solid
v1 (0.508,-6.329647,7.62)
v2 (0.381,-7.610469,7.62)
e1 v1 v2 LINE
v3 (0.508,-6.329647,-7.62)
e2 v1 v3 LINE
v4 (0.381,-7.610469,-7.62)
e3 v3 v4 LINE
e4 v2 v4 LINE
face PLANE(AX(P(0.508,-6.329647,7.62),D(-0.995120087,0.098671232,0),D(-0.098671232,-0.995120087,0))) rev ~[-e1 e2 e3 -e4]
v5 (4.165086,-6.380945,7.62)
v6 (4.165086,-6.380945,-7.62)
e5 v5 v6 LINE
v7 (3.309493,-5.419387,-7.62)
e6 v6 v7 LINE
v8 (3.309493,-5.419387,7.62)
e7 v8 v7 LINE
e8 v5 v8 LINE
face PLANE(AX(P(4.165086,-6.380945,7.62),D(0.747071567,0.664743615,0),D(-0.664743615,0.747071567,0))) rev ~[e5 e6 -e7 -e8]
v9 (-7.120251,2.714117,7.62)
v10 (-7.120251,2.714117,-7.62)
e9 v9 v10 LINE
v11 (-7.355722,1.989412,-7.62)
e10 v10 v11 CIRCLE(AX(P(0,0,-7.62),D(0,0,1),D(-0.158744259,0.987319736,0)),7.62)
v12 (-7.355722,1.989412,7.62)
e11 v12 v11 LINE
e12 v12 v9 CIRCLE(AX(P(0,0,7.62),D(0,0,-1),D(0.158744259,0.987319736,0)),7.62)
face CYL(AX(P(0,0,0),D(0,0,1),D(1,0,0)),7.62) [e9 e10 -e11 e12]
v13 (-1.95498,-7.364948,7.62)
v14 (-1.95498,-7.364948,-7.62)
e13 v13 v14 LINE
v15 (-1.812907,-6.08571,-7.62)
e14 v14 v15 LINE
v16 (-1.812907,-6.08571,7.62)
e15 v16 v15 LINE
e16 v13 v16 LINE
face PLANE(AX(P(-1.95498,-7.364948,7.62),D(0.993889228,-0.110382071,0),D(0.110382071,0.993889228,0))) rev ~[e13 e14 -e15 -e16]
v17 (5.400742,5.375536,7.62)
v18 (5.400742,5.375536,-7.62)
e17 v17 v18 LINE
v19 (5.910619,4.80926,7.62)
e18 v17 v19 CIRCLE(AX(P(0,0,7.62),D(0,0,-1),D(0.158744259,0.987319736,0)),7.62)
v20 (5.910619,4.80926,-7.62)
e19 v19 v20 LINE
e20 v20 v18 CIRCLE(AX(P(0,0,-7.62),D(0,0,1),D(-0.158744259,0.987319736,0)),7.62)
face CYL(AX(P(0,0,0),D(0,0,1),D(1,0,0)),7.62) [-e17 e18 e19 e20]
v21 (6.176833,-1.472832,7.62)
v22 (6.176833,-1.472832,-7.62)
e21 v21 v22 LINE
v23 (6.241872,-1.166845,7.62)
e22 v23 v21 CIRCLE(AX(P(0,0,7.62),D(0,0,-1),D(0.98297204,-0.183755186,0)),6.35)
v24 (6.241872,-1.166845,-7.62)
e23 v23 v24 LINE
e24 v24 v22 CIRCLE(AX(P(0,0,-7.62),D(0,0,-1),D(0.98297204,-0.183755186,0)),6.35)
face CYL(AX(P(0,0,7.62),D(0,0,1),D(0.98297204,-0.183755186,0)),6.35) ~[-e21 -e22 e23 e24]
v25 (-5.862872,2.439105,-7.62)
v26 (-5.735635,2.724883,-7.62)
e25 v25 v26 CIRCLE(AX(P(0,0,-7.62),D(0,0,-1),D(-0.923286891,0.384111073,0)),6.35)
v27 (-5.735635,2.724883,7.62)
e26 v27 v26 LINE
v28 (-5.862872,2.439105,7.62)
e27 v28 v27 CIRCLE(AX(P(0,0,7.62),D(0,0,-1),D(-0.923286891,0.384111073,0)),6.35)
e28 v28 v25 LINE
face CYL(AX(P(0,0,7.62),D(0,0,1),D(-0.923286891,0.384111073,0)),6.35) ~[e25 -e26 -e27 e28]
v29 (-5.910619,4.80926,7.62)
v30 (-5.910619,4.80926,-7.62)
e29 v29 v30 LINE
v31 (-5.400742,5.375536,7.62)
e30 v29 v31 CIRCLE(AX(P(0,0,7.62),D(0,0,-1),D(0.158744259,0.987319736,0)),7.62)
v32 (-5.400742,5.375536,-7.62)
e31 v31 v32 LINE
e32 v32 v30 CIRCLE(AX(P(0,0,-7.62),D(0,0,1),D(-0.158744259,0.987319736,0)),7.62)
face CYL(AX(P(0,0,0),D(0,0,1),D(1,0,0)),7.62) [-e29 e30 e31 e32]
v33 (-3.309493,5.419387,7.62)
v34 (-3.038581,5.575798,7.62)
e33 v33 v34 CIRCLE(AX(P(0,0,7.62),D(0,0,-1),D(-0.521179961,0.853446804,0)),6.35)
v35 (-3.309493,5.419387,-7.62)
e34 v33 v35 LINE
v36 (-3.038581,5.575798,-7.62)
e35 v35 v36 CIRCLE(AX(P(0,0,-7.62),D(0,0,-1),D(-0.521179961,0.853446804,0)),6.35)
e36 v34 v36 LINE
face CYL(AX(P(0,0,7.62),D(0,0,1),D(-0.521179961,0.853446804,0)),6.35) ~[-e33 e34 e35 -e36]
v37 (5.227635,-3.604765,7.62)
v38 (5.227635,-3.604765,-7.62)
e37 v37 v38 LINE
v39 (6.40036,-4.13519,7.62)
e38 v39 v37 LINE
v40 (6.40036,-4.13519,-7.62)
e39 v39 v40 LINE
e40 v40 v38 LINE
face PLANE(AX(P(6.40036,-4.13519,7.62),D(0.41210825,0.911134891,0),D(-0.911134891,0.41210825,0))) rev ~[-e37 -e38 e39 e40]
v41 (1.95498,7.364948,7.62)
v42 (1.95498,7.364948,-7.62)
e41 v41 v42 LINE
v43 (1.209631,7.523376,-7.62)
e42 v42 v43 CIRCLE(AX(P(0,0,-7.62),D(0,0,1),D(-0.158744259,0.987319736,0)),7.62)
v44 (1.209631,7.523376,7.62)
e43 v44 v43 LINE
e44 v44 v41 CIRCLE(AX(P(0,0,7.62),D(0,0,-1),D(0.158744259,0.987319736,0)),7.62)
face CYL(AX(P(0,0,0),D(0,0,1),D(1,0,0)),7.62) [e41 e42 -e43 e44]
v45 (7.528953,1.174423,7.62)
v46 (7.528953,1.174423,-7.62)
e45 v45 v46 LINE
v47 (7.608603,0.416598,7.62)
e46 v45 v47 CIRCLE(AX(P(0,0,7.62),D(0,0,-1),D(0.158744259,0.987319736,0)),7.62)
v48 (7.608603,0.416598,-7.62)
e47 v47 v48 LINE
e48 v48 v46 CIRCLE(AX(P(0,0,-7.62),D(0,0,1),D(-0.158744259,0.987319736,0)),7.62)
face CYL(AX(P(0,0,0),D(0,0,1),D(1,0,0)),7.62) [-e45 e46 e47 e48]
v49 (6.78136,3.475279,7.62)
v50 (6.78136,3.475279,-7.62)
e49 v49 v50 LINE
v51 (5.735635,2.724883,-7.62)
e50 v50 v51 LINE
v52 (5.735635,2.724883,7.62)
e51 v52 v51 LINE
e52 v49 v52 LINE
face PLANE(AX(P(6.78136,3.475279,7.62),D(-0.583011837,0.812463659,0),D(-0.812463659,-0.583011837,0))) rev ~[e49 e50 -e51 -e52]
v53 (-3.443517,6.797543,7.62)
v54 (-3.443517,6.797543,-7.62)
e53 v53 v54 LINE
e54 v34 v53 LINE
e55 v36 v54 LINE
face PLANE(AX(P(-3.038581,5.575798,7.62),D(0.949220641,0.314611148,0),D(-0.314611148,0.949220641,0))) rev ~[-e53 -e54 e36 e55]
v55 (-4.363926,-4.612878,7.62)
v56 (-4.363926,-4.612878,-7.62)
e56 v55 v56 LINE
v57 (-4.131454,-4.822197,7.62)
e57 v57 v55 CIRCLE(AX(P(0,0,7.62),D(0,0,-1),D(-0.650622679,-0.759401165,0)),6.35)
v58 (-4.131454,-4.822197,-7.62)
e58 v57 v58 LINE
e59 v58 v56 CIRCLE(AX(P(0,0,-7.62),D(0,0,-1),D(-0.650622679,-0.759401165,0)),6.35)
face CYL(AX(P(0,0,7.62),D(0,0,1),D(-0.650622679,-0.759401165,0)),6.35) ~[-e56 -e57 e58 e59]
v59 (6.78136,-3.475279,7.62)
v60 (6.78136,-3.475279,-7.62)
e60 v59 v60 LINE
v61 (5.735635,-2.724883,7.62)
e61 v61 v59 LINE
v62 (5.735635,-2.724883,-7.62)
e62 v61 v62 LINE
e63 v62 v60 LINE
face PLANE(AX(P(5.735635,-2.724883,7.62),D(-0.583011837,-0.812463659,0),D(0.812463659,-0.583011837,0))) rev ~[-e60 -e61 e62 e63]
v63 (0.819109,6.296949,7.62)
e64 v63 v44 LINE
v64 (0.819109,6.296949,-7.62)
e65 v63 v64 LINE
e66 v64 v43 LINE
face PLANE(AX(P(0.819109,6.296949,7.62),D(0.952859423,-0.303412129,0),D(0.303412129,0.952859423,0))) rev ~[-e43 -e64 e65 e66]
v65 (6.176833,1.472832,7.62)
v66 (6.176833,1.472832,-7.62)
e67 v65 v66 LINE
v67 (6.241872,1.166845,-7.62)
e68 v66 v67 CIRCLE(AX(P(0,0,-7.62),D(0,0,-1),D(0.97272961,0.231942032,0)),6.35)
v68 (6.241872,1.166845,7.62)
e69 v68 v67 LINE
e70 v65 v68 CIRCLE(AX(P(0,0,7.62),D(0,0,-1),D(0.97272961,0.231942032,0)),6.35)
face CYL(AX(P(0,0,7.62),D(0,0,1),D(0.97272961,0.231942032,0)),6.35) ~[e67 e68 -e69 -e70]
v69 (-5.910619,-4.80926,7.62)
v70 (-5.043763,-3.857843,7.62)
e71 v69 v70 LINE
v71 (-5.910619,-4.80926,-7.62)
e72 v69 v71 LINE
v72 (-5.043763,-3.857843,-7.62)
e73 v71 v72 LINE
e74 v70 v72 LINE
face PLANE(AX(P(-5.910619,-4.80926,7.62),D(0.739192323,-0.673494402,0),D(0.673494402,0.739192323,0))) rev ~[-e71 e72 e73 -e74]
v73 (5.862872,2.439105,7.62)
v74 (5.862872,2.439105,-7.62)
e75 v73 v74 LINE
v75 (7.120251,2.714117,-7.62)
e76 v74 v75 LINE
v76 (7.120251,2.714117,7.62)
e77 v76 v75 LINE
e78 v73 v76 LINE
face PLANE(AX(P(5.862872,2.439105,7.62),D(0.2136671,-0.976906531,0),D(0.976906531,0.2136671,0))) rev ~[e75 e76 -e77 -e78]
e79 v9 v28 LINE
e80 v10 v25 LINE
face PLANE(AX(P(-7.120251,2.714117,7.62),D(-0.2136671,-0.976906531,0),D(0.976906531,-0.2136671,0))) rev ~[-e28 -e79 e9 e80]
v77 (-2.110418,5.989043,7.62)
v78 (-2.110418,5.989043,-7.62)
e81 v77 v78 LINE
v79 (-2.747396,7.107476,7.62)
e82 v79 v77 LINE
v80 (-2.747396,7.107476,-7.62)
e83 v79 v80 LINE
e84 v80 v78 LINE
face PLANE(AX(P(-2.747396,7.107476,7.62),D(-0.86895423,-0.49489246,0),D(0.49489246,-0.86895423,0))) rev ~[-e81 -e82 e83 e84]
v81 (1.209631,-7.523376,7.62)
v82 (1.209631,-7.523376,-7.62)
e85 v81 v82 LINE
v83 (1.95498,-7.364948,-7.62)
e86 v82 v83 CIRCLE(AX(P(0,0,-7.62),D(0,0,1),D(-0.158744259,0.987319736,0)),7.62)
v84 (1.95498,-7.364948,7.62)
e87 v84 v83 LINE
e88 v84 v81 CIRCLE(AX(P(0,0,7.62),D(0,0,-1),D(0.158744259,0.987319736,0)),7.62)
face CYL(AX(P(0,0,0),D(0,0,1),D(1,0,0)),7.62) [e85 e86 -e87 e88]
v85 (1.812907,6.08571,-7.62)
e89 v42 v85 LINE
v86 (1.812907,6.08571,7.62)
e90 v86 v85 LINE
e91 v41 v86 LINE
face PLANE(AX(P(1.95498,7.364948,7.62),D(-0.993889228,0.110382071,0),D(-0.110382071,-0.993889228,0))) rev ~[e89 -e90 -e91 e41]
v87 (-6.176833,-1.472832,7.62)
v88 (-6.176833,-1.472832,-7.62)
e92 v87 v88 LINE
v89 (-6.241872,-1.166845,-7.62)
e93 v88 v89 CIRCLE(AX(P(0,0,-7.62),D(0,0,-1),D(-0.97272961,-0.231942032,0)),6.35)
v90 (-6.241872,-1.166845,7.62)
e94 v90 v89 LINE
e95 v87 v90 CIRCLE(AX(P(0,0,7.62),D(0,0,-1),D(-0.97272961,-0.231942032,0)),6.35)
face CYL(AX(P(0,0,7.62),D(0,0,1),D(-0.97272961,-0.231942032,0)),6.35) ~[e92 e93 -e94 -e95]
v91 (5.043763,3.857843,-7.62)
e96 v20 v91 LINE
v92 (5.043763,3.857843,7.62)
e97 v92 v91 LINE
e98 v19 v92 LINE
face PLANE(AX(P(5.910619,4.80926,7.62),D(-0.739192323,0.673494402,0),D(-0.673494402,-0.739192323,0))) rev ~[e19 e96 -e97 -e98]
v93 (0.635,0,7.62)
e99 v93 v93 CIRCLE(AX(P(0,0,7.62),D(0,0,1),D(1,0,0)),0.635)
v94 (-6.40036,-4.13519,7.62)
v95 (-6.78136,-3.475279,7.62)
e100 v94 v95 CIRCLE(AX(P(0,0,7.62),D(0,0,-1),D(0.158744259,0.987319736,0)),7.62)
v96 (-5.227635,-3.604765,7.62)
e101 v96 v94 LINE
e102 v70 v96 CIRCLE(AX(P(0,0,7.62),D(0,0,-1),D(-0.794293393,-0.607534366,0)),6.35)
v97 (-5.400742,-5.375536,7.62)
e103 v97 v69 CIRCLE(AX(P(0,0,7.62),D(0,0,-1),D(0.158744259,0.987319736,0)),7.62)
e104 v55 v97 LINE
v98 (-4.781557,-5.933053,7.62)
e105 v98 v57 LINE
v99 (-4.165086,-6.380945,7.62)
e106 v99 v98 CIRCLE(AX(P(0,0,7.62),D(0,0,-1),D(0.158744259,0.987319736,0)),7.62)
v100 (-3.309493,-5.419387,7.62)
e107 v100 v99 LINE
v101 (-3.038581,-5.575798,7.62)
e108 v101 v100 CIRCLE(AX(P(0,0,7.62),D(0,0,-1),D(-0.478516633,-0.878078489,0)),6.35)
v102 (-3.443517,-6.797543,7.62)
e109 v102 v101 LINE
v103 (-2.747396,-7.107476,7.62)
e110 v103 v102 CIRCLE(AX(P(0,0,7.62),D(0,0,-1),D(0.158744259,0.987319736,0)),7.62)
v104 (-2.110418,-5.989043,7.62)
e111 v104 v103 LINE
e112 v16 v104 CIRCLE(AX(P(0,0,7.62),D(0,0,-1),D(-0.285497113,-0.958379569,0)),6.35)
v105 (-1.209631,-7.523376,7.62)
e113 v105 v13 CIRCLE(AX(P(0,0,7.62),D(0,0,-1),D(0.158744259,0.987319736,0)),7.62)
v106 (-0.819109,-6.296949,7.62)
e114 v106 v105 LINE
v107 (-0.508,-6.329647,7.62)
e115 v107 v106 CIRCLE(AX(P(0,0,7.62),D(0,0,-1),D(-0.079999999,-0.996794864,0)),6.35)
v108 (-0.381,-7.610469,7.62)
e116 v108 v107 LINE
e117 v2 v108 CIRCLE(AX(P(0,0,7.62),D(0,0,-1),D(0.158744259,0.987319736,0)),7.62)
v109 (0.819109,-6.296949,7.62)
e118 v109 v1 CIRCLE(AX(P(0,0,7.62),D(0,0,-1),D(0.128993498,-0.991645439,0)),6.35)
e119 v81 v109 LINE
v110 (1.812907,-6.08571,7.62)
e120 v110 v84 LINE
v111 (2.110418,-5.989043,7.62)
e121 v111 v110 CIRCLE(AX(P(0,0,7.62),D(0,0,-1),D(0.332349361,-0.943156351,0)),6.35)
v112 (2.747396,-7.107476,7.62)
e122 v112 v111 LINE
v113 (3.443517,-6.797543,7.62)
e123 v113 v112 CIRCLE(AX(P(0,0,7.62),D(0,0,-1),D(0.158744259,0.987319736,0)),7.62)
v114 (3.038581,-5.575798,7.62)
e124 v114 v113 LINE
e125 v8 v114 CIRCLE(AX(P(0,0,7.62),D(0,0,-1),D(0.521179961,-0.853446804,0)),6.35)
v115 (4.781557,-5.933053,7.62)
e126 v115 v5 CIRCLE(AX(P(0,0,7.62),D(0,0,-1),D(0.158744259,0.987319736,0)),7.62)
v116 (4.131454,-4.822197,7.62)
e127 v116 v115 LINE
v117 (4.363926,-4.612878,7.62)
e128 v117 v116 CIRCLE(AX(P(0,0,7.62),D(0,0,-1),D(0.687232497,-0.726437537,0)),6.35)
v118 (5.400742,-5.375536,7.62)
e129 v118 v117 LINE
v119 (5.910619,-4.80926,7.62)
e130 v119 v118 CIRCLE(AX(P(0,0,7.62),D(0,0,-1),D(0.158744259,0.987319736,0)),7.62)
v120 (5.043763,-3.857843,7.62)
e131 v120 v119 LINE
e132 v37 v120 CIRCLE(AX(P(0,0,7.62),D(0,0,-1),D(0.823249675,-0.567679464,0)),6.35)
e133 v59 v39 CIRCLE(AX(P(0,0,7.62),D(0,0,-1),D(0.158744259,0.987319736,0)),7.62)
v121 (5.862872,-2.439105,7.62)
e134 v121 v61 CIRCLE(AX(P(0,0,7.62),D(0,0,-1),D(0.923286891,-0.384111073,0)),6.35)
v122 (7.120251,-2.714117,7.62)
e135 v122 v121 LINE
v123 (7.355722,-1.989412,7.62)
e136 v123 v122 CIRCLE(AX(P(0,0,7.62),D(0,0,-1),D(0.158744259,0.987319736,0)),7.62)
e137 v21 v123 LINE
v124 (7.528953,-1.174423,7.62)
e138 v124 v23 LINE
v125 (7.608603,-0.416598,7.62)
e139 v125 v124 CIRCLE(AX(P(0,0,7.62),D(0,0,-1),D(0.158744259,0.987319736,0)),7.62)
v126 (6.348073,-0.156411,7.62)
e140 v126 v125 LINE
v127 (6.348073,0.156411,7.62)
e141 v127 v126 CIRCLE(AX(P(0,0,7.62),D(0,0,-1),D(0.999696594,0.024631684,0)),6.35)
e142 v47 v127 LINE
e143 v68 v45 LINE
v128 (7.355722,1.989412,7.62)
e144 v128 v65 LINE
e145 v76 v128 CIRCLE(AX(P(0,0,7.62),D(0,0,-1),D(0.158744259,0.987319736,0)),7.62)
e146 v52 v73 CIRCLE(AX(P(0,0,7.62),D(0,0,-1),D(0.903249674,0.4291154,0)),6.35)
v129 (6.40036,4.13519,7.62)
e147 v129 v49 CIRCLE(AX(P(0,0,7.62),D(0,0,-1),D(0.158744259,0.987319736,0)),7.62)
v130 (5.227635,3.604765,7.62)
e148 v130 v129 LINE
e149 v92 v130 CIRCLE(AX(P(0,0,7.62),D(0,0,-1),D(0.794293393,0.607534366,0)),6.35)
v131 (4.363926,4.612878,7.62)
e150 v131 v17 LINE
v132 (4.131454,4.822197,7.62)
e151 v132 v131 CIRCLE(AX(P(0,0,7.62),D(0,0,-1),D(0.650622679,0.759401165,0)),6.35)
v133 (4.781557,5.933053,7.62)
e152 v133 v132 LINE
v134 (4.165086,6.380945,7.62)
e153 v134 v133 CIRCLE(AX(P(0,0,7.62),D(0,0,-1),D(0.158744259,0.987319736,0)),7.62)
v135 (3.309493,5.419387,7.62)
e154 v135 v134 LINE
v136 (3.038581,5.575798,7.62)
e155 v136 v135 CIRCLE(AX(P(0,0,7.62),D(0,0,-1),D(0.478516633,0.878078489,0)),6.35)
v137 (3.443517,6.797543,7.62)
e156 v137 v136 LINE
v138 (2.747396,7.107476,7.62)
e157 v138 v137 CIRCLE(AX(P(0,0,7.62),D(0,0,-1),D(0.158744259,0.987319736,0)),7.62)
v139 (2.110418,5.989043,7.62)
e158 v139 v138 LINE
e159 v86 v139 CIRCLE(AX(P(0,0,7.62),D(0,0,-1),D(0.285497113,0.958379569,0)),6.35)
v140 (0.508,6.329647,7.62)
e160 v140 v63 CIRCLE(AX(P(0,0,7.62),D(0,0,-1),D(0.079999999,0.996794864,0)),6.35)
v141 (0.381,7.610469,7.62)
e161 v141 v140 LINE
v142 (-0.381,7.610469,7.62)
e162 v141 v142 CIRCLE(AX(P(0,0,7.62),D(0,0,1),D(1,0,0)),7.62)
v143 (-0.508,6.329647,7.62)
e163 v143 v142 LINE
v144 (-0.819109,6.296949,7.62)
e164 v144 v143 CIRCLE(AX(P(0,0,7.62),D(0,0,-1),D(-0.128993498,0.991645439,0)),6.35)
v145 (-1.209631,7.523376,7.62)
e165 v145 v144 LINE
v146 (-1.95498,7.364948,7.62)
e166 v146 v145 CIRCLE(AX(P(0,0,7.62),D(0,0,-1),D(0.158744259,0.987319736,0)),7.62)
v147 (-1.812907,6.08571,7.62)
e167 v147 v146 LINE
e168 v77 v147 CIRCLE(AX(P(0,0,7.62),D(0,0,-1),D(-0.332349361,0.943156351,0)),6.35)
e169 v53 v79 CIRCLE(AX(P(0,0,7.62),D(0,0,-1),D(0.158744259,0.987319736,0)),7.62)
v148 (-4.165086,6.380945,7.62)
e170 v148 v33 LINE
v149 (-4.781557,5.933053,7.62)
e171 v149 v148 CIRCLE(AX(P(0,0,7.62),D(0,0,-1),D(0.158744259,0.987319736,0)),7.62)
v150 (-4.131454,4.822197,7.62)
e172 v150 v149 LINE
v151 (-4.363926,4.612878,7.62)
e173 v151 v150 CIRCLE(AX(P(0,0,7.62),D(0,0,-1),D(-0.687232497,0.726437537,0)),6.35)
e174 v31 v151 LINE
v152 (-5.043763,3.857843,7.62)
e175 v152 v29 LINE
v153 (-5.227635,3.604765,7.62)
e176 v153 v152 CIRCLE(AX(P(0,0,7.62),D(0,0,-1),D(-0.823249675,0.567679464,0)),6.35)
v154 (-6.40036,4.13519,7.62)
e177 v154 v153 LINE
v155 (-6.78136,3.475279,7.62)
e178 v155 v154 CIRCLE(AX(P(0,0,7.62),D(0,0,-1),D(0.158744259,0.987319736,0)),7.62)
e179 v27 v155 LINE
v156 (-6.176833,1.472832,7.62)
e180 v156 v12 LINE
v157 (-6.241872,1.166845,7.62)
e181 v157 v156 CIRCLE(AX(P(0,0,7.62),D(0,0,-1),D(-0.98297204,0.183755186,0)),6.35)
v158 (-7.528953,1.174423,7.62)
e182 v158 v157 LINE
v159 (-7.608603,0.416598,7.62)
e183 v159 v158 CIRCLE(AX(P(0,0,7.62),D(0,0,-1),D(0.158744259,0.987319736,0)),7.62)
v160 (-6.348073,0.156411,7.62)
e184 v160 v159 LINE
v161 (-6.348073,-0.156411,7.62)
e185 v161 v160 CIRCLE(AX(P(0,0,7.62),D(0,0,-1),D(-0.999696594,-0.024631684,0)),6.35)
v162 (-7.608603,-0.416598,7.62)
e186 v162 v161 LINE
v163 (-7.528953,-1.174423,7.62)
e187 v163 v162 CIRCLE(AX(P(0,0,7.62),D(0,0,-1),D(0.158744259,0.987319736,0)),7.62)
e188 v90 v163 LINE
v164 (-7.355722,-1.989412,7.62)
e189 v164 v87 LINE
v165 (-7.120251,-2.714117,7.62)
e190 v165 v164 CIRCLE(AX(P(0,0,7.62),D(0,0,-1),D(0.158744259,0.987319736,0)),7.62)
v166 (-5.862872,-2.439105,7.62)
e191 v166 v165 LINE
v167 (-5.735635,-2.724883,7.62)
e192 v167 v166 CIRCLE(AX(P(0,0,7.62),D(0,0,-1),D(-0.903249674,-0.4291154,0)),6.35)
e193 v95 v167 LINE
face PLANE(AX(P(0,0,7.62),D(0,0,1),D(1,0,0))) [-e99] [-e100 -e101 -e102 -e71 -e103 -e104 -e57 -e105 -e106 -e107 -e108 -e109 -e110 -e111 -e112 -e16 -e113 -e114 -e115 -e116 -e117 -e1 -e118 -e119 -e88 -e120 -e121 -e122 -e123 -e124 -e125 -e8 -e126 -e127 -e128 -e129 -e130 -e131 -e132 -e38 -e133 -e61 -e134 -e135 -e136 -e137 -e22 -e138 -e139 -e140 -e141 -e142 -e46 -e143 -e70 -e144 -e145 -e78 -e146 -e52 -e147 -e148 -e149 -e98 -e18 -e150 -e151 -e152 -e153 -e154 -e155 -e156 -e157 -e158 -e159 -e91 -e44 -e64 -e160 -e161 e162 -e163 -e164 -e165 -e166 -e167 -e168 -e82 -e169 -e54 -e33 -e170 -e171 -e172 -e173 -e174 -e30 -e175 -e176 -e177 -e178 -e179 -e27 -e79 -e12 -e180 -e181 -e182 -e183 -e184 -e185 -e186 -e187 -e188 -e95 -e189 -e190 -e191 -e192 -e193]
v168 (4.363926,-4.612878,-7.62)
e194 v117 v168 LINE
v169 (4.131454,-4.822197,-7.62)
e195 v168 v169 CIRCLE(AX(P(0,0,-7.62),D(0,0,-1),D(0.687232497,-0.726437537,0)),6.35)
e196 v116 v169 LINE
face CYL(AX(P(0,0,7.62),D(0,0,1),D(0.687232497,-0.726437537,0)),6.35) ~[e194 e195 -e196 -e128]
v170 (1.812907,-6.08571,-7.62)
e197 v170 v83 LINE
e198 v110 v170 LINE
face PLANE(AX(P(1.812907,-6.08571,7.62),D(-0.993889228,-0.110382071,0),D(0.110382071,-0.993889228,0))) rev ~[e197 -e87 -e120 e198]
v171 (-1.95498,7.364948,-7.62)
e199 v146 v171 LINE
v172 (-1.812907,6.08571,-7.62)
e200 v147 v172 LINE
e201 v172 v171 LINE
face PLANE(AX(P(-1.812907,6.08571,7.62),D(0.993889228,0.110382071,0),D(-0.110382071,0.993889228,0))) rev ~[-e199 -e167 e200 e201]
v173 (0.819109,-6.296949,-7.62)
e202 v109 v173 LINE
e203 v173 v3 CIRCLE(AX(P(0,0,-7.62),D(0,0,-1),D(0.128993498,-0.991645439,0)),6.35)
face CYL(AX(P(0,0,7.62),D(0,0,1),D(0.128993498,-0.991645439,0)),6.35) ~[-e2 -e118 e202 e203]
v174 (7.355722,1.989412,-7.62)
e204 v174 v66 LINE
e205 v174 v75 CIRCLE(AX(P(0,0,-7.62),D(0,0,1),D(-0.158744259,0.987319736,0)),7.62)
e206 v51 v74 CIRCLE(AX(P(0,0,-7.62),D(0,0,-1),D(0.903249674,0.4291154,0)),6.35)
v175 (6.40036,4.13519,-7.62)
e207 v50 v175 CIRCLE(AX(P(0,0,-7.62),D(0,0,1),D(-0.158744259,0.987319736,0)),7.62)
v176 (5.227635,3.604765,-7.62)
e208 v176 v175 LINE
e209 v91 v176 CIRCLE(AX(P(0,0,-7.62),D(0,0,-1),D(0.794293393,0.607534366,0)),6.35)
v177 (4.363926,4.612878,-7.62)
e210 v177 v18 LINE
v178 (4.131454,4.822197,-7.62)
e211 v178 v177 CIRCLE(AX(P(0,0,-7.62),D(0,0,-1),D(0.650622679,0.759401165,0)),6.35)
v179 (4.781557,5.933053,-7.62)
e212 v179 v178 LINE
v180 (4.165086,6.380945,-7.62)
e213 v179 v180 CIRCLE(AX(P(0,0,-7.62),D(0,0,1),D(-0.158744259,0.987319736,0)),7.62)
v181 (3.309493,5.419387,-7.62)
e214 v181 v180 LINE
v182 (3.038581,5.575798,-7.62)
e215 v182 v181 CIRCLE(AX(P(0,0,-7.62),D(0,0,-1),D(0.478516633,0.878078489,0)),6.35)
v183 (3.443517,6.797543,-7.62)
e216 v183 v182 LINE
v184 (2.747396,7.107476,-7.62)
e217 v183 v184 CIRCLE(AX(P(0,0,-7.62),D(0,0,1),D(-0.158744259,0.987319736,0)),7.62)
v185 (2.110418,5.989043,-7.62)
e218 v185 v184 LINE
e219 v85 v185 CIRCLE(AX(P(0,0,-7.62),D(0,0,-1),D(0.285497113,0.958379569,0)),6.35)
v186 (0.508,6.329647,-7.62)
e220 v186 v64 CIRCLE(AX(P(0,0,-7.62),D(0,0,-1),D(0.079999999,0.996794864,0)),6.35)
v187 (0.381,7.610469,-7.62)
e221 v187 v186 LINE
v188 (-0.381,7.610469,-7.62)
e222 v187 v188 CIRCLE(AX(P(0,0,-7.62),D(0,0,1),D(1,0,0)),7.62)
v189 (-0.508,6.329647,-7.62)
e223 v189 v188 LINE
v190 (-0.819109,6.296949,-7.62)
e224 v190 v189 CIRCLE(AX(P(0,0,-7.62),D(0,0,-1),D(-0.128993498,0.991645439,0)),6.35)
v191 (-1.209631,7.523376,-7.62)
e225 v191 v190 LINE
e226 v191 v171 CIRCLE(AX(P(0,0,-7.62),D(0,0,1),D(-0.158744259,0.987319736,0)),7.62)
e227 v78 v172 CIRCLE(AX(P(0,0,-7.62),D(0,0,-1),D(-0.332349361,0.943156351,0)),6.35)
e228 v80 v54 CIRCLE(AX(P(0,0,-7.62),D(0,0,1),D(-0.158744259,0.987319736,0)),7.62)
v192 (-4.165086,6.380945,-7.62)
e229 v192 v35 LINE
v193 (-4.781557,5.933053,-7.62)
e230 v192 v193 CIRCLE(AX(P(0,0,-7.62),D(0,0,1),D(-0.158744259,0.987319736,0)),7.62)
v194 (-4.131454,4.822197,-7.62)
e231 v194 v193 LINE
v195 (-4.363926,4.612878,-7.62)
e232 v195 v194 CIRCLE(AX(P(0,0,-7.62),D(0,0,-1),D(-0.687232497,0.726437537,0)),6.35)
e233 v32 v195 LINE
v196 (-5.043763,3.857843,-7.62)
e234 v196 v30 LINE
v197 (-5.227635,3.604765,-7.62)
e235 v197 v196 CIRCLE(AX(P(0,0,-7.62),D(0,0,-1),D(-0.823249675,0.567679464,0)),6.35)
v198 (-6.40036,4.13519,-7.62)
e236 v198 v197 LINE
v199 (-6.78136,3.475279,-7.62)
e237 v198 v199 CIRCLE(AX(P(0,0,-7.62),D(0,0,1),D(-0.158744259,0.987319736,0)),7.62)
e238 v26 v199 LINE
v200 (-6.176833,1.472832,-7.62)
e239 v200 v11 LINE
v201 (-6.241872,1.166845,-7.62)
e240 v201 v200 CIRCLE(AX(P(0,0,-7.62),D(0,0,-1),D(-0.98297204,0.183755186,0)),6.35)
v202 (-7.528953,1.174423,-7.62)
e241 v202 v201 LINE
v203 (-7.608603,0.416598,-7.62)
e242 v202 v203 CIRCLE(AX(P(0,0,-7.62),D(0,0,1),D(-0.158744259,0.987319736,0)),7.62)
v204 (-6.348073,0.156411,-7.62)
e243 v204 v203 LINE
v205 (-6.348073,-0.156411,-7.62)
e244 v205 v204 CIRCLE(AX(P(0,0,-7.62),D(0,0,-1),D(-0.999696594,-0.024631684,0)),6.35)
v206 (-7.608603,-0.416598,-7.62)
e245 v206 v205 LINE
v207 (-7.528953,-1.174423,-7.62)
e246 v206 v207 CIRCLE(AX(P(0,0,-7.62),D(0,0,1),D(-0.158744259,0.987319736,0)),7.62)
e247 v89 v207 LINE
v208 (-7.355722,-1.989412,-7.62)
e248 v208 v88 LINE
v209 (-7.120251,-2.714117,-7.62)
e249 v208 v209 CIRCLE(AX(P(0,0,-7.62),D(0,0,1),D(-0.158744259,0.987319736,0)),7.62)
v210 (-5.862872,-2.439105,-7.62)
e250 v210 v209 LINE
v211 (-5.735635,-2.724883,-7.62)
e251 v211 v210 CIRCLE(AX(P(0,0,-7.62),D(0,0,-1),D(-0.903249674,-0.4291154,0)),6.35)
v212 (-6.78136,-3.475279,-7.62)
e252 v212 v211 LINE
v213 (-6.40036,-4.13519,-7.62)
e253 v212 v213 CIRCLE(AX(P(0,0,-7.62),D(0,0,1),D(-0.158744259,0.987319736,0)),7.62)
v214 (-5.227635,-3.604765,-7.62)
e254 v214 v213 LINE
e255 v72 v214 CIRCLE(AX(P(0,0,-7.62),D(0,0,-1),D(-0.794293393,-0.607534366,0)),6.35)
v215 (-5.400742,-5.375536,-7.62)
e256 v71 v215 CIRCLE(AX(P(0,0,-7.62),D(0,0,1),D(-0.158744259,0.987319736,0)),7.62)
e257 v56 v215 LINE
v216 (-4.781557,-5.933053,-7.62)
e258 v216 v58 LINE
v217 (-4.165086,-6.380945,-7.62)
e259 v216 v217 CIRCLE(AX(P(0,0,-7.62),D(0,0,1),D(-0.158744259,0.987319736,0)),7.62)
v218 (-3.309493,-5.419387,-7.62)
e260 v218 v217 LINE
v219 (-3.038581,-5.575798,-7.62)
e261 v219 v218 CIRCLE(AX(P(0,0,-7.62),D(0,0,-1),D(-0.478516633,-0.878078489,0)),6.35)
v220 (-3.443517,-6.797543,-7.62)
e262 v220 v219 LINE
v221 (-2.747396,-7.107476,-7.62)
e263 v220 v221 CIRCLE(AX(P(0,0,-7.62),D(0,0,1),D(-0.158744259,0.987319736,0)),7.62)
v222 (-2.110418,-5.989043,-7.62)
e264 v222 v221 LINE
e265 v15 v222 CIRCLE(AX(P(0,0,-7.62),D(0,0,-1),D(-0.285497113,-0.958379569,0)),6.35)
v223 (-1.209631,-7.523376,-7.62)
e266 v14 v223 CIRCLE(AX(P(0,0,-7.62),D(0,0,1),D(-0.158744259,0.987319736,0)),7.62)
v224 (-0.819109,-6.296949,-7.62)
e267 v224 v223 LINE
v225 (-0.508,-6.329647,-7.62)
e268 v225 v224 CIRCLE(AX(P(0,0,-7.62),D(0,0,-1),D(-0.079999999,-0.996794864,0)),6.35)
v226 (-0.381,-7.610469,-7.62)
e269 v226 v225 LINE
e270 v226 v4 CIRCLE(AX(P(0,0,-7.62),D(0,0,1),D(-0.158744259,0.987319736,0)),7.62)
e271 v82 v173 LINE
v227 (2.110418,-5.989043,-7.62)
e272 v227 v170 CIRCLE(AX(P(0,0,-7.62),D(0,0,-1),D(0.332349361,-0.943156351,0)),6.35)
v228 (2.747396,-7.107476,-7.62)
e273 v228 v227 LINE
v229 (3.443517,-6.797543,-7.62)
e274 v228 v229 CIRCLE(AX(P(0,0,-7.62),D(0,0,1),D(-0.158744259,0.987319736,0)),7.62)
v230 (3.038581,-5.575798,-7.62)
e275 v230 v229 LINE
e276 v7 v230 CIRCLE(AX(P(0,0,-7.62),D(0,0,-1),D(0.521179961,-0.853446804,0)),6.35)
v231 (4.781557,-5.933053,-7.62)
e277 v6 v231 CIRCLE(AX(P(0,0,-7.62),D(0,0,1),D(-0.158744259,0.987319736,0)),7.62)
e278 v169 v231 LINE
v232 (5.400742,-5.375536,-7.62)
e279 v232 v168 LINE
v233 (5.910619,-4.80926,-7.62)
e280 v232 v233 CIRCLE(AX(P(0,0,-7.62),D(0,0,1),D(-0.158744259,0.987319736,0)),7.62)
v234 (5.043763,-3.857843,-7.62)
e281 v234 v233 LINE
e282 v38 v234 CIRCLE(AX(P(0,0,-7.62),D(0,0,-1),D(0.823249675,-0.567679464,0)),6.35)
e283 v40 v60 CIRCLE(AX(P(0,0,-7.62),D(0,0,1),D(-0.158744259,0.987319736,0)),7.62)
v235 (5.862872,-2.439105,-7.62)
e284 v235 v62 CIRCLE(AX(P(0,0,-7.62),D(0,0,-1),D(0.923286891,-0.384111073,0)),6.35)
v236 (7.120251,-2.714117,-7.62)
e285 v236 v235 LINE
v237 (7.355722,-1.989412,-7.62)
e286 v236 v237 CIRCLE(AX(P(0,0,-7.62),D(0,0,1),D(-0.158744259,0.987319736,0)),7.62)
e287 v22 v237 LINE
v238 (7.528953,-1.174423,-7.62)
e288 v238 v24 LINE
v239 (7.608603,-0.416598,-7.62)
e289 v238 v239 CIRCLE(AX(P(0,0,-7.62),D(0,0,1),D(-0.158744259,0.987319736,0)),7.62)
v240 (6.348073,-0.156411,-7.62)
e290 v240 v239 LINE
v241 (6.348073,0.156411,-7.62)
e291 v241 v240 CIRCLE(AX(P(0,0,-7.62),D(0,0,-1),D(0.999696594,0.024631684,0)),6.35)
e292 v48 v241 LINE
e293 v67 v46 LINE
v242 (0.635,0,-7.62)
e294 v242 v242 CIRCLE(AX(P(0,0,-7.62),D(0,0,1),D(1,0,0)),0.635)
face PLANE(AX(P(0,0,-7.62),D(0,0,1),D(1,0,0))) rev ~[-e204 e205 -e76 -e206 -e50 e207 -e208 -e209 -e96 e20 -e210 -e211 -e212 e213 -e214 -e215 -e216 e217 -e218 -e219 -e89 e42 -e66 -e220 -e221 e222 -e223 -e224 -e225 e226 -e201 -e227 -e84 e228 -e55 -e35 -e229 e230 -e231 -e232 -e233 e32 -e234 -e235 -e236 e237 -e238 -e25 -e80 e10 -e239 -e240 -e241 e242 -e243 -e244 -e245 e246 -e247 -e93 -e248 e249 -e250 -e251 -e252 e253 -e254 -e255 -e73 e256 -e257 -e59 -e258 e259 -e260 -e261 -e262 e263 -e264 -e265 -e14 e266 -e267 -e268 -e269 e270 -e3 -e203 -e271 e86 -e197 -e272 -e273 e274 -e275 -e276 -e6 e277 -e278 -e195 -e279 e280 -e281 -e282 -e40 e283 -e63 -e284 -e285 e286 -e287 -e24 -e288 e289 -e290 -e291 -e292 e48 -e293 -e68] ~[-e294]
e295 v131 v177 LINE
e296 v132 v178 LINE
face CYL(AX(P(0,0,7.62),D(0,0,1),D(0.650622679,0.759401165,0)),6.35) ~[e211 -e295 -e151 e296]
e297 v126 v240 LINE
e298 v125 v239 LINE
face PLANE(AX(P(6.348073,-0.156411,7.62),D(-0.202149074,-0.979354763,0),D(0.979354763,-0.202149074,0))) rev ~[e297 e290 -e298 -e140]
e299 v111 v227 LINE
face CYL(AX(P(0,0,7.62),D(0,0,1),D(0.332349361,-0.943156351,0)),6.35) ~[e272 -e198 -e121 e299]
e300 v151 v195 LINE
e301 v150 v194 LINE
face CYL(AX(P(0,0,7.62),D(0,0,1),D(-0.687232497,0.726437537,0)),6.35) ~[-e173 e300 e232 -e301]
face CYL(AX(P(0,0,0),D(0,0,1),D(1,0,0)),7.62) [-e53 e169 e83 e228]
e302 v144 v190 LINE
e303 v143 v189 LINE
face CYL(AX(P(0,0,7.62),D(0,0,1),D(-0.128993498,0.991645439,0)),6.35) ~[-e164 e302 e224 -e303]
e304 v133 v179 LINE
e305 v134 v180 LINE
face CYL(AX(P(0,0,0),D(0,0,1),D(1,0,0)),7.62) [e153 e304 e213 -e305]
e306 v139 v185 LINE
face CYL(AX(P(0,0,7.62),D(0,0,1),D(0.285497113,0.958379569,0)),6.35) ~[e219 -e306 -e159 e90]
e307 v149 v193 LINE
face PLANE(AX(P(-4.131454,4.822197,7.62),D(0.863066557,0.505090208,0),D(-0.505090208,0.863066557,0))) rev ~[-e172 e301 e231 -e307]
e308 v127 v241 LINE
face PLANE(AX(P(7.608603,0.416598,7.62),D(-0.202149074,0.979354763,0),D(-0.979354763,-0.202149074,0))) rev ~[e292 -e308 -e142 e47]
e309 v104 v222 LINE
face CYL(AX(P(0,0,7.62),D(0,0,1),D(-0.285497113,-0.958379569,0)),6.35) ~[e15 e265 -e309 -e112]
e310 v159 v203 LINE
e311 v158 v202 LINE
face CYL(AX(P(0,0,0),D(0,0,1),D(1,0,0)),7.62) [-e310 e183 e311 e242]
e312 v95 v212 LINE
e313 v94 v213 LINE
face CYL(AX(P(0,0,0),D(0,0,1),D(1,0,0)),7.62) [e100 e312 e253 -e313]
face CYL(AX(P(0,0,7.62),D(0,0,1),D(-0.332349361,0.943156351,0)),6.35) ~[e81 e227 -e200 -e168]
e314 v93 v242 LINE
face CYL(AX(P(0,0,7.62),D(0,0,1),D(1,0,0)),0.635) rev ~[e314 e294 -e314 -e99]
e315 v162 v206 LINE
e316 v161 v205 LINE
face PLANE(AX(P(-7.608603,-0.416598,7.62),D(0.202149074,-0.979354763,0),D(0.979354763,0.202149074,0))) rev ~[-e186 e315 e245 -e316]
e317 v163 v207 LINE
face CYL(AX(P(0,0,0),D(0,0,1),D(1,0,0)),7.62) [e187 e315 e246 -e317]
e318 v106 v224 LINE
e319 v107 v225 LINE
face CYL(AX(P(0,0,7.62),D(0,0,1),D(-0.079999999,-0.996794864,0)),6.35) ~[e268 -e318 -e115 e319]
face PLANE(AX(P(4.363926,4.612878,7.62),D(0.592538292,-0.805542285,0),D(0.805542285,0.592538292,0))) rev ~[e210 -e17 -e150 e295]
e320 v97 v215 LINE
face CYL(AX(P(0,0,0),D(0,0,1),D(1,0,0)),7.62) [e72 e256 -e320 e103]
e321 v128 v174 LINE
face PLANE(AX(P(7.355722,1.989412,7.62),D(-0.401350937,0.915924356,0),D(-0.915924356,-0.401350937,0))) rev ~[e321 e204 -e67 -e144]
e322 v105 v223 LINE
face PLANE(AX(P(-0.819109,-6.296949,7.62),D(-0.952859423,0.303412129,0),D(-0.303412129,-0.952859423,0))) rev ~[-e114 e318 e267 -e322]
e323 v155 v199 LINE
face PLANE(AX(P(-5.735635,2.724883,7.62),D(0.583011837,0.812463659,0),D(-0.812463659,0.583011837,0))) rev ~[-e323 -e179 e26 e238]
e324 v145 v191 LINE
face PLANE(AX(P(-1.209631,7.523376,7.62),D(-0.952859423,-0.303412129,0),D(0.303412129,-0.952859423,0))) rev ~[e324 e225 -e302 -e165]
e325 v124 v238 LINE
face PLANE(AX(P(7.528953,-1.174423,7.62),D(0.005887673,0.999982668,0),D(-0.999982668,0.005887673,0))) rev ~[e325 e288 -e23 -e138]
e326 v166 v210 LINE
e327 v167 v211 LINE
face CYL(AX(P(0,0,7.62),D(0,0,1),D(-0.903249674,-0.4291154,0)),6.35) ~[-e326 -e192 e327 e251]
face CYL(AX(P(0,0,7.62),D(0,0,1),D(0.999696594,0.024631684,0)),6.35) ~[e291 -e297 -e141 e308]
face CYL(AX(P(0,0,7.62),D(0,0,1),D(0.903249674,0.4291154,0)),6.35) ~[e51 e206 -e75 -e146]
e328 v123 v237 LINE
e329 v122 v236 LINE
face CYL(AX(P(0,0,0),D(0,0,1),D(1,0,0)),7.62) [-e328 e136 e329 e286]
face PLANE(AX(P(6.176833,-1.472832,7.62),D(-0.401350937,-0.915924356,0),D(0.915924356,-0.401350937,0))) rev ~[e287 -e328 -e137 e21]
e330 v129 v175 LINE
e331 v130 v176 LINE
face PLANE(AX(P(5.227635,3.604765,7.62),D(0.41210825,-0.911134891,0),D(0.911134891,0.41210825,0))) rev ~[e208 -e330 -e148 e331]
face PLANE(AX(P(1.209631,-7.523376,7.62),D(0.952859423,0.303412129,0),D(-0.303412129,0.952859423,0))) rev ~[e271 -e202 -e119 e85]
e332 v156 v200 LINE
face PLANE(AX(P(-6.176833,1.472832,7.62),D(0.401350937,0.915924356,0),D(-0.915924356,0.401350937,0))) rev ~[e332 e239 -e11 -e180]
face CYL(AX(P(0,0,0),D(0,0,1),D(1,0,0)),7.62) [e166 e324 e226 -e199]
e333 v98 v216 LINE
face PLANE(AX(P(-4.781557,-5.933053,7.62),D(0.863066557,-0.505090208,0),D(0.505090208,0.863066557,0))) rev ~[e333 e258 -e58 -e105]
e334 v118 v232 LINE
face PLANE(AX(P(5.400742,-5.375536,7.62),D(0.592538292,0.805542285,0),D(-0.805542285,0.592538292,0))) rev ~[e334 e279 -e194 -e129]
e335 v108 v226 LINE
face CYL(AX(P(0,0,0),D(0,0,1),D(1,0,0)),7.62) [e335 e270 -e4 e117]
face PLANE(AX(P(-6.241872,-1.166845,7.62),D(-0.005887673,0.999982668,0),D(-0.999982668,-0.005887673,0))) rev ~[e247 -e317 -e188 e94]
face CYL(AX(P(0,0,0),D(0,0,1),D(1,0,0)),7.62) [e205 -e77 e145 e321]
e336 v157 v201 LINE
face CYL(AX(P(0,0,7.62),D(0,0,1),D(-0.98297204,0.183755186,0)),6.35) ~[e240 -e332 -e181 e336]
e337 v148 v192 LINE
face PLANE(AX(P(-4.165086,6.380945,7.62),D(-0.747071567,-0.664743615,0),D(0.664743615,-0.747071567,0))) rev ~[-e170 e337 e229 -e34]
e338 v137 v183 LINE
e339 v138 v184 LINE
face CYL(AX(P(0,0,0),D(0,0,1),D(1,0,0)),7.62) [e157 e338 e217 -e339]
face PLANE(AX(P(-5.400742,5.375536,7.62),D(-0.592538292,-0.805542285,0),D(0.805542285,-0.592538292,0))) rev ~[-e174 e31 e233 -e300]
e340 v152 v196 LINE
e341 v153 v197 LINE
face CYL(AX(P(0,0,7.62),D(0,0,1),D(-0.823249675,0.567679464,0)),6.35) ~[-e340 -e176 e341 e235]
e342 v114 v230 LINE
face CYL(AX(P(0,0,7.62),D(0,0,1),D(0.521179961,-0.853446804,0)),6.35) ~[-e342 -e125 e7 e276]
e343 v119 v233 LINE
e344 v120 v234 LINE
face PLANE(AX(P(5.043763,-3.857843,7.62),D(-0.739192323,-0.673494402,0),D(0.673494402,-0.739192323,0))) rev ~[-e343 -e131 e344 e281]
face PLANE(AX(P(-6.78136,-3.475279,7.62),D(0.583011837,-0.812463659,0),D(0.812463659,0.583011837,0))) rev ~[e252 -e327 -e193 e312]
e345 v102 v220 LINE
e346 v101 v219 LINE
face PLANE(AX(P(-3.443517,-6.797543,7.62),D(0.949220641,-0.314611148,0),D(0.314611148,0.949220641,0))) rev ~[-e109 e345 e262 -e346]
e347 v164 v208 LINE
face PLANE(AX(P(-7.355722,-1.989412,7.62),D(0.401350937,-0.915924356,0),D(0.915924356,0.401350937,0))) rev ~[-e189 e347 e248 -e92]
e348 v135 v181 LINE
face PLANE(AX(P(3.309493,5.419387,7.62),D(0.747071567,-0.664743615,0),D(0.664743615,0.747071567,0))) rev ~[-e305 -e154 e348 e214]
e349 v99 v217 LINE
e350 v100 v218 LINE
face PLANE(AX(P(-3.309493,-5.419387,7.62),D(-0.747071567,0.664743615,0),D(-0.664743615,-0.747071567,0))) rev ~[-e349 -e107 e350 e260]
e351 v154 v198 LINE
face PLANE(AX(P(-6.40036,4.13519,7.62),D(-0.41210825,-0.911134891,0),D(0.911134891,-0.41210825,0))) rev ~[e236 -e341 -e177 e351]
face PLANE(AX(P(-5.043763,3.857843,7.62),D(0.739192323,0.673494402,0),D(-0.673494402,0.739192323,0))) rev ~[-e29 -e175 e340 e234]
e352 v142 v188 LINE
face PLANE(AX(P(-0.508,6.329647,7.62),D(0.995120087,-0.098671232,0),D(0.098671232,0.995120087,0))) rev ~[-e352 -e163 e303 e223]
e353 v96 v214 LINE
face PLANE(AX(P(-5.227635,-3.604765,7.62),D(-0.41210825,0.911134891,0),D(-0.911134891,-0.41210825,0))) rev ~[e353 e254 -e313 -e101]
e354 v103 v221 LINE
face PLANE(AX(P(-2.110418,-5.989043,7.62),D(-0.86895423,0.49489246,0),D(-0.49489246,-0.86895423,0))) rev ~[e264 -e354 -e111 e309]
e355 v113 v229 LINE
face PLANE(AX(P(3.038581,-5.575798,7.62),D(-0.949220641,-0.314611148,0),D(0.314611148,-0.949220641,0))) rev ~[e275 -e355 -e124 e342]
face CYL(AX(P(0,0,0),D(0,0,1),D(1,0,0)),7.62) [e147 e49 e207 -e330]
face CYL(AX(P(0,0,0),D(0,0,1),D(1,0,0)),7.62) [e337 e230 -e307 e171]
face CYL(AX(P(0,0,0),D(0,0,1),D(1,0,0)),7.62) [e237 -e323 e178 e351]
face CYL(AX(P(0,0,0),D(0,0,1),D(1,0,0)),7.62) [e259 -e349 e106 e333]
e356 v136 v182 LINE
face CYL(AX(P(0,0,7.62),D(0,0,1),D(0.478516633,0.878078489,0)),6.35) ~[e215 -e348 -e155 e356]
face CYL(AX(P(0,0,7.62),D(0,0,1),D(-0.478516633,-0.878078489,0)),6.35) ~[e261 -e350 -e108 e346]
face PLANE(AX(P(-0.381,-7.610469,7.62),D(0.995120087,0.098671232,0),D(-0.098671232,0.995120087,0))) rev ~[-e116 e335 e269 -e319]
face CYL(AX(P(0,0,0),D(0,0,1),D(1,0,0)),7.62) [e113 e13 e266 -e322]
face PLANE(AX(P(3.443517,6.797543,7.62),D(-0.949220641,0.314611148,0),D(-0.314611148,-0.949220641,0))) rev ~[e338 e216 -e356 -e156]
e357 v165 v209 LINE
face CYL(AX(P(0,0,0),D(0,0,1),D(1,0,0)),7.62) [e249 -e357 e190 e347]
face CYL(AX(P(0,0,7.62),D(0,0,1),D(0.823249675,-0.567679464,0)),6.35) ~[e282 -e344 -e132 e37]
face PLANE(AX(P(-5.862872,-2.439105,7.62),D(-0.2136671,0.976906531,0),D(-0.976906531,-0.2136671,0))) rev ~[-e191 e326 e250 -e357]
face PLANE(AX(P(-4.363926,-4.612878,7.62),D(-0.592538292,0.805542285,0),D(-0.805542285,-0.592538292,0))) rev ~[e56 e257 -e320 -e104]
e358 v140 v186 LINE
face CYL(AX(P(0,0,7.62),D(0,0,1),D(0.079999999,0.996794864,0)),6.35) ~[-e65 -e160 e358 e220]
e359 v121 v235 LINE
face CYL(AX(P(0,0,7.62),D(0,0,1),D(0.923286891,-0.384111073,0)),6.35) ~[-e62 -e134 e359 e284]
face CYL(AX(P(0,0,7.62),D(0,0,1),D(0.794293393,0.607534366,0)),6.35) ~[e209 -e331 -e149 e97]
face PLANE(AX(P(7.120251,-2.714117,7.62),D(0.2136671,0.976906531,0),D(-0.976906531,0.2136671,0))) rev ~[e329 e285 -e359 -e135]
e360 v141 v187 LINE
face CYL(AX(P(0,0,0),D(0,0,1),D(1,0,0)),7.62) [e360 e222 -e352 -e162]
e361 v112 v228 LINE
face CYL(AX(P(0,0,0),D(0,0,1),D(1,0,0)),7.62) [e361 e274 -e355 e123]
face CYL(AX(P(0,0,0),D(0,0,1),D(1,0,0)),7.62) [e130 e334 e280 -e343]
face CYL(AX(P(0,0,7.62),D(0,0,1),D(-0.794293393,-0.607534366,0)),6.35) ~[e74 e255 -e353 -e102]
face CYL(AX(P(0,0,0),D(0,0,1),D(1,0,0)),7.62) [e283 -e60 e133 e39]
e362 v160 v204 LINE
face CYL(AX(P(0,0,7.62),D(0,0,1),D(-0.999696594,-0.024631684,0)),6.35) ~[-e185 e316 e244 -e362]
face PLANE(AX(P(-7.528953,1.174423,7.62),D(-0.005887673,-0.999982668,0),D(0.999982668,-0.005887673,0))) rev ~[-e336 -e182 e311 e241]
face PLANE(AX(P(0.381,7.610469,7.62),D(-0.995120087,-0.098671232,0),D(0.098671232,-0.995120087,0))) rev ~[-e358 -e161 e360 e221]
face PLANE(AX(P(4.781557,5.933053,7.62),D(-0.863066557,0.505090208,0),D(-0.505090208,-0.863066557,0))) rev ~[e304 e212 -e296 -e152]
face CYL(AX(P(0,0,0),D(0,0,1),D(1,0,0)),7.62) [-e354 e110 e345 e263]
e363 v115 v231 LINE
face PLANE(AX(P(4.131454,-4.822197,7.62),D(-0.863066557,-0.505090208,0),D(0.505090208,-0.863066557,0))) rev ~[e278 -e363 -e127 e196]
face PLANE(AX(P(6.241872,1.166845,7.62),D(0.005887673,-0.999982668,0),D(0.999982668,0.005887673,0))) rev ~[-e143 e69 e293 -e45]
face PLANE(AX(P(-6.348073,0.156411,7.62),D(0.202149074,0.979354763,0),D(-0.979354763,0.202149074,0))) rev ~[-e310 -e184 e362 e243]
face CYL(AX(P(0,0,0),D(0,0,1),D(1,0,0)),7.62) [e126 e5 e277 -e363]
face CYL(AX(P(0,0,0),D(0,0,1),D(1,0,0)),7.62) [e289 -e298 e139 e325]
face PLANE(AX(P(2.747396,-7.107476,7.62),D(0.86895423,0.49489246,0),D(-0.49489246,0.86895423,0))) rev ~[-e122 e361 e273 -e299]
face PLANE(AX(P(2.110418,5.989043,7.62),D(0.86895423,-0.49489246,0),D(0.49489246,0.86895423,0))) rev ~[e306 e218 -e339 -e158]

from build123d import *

# Parameters (mm, degrees)
F0_R            = 7.62
F1_DEPTH        = 7.62
F2_R            = 0.635
F3_DEPTH        = 15.24
F5_DEPTH        = 15.24
F5_COPIES_COUNT = 30


# Not quite as in the source:
# - a pattern or mirror of a feature is missing from the dataset's text; its kind, count and spacing are read off the source's solid


with BuildPart() as f1:
    # F0 (on Top) → F1 (new body, symmetric)
    with BuildSketch(Plane.XY):
        Circle(F0_R)
    extrude(amount=F1_DEPTH, both=True)

    # F2 (on face) → F3 (cut, through all)
    with BuildSketch(Plane.XY.offset(7.62)):
        Circle(F2_R)
    extrude(amount=-F3_DEPTH, mode=Mode.SUBTRACT)

    # F4 (on face) → F5 (cut, through all)
    with BuildSketch(Plane.XY.offset(7.62)):
        with BuildLine():
            ThreePointArc((1.20963125, 7.5233763856), (0.7965068901, 7.5782568427), (0.381, 7.6104690394))
            Line((0.381, 7.6104690394), (0.508, 6.3296473835))
            ThreePointArc((0.508, 6.3296473835), (0.6637557417, 6.3152140356), (0.8191087086, 6.2969485406))
            Line((0.8191087086, 6.2969485406), (1.20963125, 7.5233763856))
        make_face()
    f5 = extrude(amount=-F5_DEPTH, mode=Mode.SUBTRACT)

    # F5_copies: F5 ×30 about axis
    f5_copies_axis = Axis((0, 0, 0), (0, 0, 1))
    for i in range(1, F5_COPIES_COUNT):
        add(f5.rotate(f5_copies_axis, i * 360 / F5_COPIES_COUNT), mode=Mode.SUBTRACT)


solid = f1.part
